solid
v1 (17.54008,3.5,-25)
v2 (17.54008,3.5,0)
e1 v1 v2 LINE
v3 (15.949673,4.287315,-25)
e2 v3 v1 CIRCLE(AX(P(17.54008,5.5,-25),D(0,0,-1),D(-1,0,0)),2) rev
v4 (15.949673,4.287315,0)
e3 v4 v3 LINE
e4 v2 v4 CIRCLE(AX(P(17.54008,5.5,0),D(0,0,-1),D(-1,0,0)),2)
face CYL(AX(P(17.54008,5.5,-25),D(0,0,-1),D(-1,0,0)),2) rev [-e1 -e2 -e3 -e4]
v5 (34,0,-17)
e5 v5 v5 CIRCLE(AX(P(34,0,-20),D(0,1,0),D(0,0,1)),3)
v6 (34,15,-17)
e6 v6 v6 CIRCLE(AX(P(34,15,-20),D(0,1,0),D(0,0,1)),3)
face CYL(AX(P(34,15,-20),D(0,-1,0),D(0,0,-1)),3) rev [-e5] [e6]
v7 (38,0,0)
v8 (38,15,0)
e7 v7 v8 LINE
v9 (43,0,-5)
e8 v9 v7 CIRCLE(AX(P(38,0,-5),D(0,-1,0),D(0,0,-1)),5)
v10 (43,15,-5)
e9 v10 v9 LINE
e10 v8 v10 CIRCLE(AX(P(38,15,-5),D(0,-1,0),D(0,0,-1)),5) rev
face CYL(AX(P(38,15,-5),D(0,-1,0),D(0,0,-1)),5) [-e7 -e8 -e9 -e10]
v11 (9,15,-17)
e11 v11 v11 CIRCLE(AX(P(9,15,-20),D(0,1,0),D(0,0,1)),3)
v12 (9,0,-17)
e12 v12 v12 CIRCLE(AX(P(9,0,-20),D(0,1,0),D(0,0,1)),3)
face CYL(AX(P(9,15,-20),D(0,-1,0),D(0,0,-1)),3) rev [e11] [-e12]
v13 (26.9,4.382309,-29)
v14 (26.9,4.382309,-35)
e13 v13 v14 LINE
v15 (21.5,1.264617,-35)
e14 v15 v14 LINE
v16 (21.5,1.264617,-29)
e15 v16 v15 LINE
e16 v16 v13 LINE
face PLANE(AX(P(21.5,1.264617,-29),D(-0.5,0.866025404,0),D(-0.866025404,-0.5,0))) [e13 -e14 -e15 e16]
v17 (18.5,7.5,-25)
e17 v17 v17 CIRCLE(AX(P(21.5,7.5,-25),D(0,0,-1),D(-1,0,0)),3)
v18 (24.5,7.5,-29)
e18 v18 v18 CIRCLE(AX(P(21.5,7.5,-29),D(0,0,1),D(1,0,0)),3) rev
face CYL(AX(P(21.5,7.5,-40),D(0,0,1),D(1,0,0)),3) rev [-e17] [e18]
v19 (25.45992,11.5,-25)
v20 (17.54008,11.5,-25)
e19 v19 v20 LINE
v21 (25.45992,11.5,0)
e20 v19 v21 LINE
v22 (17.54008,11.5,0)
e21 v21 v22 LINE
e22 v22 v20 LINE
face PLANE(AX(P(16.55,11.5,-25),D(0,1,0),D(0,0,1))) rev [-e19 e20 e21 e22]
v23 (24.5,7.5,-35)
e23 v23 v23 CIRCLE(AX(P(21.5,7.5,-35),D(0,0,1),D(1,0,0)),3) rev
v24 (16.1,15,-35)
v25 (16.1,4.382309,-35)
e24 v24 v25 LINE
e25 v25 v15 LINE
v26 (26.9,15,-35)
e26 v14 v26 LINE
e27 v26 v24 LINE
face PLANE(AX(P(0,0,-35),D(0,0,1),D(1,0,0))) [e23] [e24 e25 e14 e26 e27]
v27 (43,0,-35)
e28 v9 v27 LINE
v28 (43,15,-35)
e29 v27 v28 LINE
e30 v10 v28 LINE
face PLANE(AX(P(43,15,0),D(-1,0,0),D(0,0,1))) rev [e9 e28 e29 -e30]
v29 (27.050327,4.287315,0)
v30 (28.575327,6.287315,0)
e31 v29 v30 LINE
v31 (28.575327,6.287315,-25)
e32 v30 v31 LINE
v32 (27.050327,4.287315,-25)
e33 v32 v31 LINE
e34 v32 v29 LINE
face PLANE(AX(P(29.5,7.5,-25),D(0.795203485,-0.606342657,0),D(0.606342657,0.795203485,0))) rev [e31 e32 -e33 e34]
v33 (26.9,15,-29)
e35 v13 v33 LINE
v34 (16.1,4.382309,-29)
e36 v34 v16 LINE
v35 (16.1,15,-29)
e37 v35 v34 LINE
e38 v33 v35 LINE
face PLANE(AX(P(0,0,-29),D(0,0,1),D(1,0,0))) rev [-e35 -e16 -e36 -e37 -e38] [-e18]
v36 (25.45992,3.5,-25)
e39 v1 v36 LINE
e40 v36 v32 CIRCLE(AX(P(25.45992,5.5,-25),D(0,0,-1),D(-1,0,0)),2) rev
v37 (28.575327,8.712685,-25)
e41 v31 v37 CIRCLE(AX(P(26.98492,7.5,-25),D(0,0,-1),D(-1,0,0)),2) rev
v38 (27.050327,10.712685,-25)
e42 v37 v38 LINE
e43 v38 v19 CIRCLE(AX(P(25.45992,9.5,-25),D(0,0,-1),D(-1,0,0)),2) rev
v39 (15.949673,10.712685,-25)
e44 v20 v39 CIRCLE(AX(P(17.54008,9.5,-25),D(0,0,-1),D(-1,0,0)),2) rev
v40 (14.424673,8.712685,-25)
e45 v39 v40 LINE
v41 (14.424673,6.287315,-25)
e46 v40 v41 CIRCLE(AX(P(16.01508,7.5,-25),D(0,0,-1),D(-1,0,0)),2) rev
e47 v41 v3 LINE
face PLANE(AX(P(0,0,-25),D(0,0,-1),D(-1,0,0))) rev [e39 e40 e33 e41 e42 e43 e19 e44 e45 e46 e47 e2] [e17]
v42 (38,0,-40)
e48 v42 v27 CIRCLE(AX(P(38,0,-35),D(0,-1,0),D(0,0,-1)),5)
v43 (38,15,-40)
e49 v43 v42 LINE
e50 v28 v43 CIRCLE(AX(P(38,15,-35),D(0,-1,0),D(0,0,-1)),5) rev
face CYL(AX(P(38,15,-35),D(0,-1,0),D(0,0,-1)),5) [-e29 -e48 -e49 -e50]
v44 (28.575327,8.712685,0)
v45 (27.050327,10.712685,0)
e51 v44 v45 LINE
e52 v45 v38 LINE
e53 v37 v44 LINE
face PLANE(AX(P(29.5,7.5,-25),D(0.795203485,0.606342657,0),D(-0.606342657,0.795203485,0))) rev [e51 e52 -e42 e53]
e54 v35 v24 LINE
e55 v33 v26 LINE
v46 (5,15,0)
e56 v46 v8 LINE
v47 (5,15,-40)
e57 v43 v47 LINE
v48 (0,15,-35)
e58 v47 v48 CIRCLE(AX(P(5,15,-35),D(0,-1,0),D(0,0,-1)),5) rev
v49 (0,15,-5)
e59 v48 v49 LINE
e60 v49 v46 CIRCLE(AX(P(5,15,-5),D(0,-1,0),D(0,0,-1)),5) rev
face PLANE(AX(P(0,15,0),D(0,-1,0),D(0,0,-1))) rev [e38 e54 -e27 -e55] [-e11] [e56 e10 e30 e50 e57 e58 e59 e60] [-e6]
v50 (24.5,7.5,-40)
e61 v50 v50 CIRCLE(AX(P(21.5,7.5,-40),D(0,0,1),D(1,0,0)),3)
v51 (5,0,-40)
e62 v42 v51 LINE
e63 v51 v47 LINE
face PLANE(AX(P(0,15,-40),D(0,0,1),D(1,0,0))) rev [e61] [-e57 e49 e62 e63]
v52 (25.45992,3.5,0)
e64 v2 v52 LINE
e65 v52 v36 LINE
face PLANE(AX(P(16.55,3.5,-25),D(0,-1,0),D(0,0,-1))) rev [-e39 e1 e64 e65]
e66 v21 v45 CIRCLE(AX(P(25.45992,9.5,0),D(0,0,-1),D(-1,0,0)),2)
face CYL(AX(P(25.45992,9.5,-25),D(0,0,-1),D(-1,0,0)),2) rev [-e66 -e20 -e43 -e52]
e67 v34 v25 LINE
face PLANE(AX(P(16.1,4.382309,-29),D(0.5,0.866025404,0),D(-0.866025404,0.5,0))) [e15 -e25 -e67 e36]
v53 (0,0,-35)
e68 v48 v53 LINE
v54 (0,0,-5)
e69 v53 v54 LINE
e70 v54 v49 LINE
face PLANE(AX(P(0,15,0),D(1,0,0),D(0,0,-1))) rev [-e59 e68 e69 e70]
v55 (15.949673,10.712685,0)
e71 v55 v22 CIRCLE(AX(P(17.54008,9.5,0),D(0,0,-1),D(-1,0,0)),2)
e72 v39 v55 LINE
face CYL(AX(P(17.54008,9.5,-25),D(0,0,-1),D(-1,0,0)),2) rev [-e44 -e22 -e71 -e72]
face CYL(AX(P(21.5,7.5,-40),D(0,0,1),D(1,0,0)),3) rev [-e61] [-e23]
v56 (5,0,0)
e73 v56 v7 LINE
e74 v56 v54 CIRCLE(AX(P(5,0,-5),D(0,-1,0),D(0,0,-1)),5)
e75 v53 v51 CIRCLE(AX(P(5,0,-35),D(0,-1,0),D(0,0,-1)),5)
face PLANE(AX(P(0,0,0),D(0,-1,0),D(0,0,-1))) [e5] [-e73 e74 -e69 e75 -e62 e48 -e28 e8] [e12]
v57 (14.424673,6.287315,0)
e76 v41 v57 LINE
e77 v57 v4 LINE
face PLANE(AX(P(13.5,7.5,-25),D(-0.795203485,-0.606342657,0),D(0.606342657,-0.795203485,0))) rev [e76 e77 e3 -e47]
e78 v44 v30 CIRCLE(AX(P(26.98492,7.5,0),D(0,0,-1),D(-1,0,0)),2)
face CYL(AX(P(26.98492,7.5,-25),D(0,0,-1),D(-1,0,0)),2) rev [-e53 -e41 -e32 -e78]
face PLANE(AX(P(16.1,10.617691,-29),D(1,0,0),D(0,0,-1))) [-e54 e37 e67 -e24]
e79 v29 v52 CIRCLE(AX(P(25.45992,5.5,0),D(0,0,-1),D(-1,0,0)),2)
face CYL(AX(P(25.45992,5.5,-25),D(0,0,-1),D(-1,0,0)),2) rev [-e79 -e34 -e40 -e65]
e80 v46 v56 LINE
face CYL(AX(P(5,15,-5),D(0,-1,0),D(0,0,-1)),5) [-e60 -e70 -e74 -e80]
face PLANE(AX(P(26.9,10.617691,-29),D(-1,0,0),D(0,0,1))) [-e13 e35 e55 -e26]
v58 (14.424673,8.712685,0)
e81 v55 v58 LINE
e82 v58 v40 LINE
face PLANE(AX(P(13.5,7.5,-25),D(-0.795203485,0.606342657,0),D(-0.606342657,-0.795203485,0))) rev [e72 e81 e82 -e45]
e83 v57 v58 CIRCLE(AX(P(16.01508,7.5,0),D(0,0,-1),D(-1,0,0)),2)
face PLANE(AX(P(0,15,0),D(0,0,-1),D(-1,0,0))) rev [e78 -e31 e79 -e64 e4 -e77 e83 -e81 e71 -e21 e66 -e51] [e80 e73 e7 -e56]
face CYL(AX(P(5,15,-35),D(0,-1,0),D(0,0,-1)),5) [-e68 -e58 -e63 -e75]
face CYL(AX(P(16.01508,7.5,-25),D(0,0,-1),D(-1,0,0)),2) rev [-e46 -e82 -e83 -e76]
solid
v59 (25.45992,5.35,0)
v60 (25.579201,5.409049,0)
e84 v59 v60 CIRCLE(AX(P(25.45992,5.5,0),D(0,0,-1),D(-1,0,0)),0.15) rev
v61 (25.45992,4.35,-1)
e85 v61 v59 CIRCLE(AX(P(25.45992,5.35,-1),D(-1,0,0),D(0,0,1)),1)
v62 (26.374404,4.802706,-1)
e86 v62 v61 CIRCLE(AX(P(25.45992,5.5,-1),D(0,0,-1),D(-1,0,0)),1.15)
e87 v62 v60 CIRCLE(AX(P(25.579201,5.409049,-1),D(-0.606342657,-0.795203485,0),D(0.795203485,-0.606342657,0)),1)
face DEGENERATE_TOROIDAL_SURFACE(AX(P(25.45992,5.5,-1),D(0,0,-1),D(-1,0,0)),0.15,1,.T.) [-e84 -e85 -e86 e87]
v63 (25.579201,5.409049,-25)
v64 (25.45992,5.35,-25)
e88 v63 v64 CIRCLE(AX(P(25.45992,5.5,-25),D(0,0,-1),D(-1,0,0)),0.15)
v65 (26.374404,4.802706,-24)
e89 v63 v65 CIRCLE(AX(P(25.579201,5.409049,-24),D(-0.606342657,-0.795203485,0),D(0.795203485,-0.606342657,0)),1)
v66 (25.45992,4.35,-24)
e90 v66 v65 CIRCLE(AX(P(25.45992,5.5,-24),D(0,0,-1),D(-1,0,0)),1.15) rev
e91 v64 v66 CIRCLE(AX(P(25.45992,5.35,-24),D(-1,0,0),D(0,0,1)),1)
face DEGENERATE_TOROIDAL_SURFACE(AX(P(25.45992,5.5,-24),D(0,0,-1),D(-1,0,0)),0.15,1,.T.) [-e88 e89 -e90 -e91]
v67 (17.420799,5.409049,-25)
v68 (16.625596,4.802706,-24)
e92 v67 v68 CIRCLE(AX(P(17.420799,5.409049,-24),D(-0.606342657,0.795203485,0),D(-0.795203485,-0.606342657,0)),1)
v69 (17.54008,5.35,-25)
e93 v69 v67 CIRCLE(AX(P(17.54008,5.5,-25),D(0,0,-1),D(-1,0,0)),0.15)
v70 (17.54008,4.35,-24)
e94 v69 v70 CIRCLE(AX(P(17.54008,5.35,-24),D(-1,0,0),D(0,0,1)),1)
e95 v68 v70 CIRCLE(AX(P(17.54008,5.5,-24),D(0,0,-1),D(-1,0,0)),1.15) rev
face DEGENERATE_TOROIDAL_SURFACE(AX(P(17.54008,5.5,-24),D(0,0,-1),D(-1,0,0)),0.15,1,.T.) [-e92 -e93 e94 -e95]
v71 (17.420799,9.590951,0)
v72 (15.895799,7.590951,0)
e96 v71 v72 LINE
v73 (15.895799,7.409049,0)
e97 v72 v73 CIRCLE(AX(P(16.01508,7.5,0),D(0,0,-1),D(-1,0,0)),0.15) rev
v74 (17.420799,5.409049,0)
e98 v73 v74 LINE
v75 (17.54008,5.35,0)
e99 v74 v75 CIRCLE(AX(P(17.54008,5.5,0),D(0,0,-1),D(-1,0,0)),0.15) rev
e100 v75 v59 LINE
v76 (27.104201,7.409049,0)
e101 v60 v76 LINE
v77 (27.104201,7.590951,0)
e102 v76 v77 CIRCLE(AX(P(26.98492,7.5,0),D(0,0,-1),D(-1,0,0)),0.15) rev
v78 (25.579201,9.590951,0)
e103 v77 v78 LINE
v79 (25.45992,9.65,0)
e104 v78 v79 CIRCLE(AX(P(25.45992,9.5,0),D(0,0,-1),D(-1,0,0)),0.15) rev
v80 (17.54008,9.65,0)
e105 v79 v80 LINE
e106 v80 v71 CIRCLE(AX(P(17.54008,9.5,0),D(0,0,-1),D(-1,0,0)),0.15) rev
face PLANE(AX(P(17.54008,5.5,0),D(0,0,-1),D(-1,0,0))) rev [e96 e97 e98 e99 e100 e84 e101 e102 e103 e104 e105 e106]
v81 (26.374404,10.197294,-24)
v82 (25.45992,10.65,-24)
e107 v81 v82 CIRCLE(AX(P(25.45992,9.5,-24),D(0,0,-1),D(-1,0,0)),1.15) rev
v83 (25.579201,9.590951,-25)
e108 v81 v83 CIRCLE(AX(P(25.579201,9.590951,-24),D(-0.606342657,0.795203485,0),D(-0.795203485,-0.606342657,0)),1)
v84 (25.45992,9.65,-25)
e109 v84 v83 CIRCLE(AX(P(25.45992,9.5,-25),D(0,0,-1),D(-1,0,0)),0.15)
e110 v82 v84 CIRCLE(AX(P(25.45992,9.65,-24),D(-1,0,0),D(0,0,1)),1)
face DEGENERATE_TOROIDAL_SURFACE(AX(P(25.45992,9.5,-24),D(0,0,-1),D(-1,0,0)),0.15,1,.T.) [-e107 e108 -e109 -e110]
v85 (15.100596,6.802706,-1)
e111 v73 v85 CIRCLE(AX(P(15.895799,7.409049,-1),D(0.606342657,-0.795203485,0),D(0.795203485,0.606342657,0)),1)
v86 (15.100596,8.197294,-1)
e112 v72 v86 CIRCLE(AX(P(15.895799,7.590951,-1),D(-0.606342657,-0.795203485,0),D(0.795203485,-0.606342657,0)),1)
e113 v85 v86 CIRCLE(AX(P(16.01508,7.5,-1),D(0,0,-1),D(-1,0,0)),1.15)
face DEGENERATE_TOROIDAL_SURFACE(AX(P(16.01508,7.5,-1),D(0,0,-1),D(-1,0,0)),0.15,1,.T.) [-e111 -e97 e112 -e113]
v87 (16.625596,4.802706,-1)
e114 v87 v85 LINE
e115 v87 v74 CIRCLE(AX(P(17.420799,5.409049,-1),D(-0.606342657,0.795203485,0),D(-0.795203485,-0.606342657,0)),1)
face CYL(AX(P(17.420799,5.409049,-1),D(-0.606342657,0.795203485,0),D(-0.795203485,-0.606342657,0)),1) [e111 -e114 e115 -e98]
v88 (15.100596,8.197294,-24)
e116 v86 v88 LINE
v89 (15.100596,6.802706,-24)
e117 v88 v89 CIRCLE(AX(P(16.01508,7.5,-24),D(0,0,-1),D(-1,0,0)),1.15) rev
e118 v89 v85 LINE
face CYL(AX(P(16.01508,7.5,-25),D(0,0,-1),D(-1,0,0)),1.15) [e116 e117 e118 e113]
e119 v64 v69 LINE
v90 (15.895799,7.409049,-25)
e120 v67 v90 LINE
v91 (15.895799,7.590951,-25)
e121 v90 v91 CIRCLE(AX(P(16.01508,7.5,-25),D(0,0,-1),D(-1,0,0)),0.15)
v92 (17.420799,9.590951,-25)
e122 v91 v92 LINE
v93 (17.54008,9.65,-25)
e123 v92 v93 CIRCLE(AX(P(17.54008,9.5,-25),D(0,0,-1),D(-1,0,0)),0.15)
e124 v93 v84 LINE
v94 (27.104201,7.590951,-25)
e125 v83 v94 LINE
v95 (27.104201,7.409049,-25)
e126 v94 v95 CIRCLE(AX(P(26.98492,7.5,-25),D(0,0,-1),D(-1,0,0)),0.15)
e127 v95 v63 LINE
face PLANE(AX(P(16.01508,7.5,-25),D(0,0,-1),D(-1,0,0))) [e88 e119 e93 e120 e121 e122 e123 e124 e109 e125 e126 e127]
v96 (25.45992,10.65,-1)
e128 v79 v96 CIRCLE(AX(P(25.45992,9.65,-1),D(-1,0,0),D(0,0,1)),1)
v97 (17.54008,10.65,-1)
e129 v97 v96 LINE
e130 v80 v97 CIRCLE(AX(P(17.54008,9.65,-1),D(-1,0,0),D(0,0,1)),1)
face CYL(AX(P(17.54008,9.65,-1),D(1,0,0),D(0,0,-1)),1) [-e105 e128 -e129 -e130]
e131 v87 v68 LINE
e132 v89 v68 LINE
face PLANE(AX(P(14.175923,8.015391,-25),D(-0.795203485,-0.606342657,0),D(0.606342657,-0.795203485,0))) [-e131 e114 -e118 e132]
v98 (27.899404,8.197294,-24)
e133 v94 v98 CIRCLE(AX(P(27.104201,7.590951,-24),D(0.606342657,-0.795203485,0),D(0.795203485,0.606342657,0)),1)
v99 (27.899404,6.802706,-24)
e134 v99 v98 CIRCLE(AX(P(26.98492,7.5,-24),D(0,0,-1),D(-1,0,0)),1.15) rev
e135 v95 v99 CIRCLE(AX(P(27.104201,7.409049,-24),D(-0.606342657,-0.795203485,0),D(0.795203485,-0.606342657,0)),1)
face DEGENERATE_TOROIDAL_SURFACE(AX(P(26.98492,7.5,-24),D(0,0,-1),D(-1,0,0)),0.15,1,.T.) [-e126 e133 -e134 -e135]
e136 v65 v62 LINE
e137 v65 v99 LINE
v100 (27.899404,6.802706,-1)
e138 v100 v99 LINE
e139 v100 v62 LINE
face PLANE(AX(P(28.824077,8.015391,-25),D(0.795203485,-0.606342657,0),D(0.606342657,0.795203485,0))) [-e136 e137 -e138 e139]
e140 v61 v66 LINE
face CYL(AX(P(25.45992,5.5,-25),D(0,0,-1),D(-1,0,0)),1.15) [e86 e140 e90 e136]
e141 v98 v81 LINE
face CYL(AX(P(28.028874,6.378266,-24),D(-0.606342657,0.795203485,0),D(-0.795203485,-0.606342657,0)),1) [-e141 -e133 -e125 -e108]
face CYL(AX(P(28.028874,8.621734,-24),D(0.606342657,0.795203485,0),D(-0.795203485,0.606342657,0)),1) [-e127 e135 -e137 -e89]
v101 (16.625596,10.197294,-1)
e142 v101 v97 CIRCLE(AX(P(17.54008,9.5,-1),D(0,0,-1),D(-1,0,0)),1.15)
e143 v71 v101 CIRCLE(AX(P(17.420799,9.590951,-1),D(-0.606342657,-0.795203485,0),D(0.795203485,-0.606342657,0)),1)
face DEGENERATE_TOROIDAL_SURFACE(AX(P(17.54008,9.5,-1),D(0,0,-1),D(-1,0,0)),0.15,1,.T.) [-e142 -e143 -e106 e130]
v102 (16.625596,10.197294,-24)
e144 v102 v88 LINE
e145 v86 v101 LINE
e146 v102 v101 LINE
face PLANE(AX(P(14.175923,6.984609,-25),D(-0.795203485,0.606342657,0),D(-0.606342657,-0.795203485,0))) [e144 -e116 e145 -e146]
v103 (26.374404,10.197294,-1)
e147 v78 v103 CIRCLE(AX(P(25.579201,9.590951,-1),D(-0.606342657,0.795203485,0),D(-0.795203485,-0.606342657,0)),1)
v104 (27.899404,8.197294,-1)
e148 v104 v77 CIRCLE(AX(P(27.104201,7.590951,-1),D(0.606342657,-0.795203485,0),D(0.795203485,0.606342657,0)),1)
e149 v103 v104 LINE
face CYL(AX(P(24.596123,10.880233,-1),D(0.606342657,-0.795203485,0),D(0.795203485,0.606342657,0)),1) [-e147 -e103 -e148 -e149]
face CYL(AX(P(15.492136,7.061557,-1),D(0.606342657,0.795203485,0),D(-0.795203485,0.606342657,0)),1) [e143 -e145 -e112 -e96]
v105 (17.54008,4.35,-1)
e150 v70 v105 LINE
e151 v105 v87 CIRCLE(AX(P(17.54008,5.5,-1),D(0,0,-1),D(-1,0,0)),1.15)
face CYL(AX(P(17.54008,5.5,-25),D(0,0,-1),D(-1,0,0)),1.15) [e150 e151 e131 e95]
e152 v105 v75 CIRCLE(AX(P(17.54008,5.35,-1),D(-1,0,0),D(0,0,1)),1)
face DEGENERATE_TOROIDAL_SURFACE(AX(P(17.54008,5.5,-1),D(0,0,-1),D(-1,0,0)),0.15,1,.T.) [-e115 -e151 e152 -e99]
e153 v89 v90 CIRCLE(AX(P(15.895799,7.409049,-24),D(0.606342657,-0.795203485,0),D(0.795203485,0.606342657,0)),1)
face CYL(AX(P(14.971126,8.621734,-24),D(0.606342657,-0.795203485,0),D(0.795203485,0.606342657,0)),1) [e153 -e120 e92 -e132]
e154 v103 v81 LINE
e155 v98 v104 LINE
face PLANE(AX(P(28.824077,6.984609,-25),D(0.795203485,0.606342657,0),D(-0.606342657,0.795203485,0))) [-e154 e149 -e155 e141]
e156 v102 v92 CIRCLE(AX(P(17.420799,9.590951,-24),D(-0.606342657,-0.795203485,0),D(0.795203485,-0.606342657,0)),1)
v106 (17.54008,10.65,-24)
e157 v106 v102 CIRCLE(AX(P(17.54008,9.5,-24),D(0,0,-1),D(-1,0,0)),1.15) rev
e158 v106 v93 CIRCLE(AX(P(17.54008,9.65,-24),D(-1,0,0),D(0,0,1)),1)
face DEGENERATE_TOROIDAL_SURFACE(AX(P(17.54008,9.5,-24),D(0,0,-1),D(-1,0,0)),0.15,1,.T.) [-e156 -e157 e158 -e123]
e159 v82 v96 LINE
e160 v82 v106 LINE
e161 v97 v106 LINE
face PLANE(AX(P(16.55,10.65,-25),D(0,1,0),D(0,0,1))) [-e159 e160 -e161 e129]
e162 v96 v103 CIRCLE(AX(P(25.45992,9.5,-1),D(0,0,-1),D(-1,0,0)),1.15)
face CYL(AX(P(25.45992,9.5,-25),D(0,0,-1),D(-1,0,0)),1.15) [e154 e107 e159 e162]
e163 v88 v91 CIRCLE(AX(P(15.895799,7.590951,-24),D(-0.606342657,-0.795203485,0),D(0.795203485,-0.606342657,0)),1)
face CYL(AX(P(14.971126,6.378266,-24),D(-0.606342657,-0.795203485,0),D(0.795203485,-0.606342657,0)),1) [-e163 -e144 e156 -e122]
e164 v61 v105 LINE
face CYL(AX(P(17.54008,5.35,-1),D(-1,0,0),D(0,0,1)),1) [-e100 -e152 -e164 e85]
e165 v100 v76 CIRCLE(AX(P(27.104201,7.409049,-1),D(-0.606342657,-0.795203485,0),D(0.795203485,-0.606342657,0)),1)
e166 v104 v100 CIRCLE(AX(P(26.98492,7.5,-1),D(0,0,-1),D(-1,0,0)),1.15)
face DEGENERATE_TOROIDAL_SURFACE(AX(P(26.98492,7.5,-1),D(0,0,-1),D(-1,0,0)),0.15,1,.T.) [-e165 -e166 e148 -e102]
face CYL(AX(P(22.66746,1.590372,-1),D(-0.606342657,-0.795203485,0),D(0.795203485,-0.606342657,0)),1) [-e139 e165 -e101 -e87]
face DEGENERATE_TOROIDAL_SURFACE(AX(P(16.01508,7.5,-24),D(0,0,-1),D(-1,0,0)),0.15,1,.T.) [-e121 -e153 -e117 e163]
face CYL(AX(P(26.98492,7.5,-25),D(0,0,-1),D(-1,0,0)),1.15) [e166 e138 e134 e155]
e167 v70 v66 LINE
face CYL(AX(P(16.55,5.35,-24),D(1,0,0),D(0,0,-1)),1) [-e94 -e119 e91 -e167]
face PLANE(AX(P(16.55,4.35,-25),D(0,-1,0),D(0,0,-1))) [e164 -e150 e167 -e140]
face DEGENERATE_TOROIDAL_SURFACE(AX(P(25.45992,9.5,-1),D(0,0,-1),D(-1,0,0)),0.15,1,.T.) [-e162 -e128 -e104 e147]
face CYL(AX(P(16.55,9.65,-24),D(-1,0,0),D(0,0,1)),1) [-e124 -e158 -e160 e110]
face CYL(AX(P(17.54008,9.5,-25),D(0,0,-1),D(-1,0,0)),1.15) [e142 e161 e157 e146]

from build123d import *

# Parameters (mm, degrees)
SKETCH1_W           = 43
SKETCH1_H           = 40
BOSS_EXTRUDE1_DEPTH = 15
CUT_EXTRUDE1_DEPTH  = 25
SKETCH3_R           = 3
CUT_EXTRUDE2_DEPTH  = 61.613529843
SKETCH4_R           = 3
CUT_EXTRUDE3_DEPTH  = 61.613529843
FILLET1_R           = 2
FILLET3_R           = 5
SURFACE_KNIT1_START = -25
SURFACE_KNIT1_DEPTH = 25
FILLET2_R           = 1
CUT_EXTRUDE4_START  = 5
CUT_EXTRUDE4_DEPTH  = 6


# Read off the part's stored shape, not the designer's step: Surface-Knit1
with BuildPart() as part:
    # Sketch1 → Boss-Extrude1 (new body)
    with BuildSketch(Plane(origin=(0, 0, 0), x_dir=(1, 0, 0), z_dir=(0, 1, 0))):
        with Locations((21.5, 20)):
            Rectangle(SKETCH1_W, SKETCH1_H)
    extrude(amount=BOSS_EXTRUDE1_DEPTH)

    # Sketch2 → Cut-Extrude1 (cut)
    with BuildSketch(Plane.XY):
        Polygon((13.5, 7.5), (16.55, 11.5), (26.45, 11.5), (29.5, 7.5), (26.45, 3.5), (16.55, 3.5), align=None)
    extrude(amount=-CUT_EXTRUDE1_DEPTH, mode=Mode.SUBTRACT)

    # Sketch3 → Cut-Extrude2 (cut, through all)
    with BuildSketch(Plane.XY):
        with Locations((21.5, 7.5)):
            Circle(SKETCH3_R)
    extrude(amount=-CUT_EXTRUDE2_DEPTH, mode=Mode.SUBTRACT)

    # Sketch4 → Cut-Extrude3 (cut, through all)
    with BuildSketch(Plane(origin=(0, 0, 0), x_dir=(1, 0, 0), z_dir=(0, 1, 0))):
        with Locations(Location((9, 20, 0), (0, 0, 270))):
            Circle(SKETCH4_R)
        with Locations(Location((34, 20, 0), (0, 0, 270))):
            Circle(SKETCH4_R)
    extrude(amount=CUT_EXTRUDE3_DEPTH, mode=Mode.SUBTRACT)

    # Fillet1
    fillet1_edges = [part.edges().sort_by_distance(p)[0] for p in [
        (16.55, 3.5, -12.5),
        (13.5, 7.5, -12.5),
        (16.55, 11.5, -12.5),
        (26.45, 11.5, -12.5),
        (29.5, 7.5, -12.5),
        (26.45, 3.5, -12.5),
    ]]
    fillet(fillet1_edges, radius=FILLET1_R)

    # Fillet3
    fillet3_edges = [part.edges().sort_by_distance(p)[0] for p in [
        (0, 7.5, -40),
        (43, 7.5, -40),
        (43, 7.5, 0),
        (0, 7.5, 0),
    ]]
    fillet(fillet3_edges, radius=FILLET3_R)

    # Sketch6 → Cut-Extrude4 (cut)
    with BuildSketch(Plane.XY.offset(-40).offset(CUT_EXTRUDE4_START)):
        Polygon((26.9, 10.617691454), (26.9, 15), (16.1, 15), (16.1, 10.617691454), (16.1, 4.382308546), (21.5, 1.264617093), (26.9, 4.382308546), align=None)
    extrude(amount=CUT_EXTRUDE4_DEPTH, mode=Mode.SUBTRACT)


with BuildPart() as body_2:
    # Surface-Knit1 outline → Surface-Knit1 (new body)
    with BuildSketch(Plane.XY.offset(SURFACE_KNIT1_START)):
        with BuildLine():
            ThreePointArc((16.625595514, 4.802705944), (17.029877681, 4.469371996), (17.540079522, 4.35))
            Line((17.540079522, 4.35), (25.459920478, 4.35))
            ThreePointArc((25.459920478, 4.35), (25.970122319, 4.469371996), (26.374404486, 4.802705944))
            Line((26.374404486, 4.802705944), (27.899404486, 6.802705944))
            ThreePointArc((27.899404486, 6.802705944), (28.134920478, 7.5), (27.899404486, 8.197294056))
            Line((27.899404486, 8.197294056), (26.374404486, 10.197294056))
            ThreePointArc((26.374404486, 10.197294056), (25.970122319, 10.530628004), (25.459920478, 10.65))
            Line((25.459920478, 10.65), (17.540079522, 10.65))
            ThreePointArc((17.540079522, 10.65), (17.029877681, 10.530628004), (16.625595514, 10.197294056))
            Line((16.625595514, 10.197294056), (15.100595514, 8.197294056))
            ThreePointArc((15.100595514, 8.197294056), (14.865079522, 7.5), (15.100595514, 6.802705944))
            Line((15.100595514, 6.802705944), (16.625595514, 4.802705944))
        make_face()
    extrude(amount=SURFACE_KNIT1_DEPTH)

    # Fillet2
    fillet2_edges = [body_2.edges().sort_by_distance(p)[0] for p in [
        (14.865079522, 7.5, 0),
        (15.863095514, 9.197294056, -25),
        (15.863095514, 9.197294056, 0),
        (21.5, 10.65, -25),
        (21.5, 10.65, 0),
        (17.029877681, 10.530628004, -25),
        (17.029877681, 10.530628004, 0),
        (25.970122319, 10.530628004, -25),
        (25.970122319, 10.530628004, 0),
        (27.136904486, 9.197294056, -25),
        (27.136904486, 9.197294056, 0),
        (28.134920478, 7.5, -25),
        (28.134920478, 7.5, 0),
        (25.970122319, 4.469371996, -25),
        (25.970122319, 4.469371996, 0),
        (27.136904486, 5.802705944, -25),
        (27.136904486, 5.802705944, 0),
        (21.5, 4.35, -25),
        (21.5, 4.35, 0),
        (17.029877681, 4.469371996, -25),
        (17.029877681, 4.469371996, 0),
        (15.863095514, 5.802705944, 0),
        (15.863095514, 5.802705944, -25),
        (14.865079522, 7.5, -25),
    ]]
    fillet(fillet2_edges, radius=FILLET2_R)


solid = Compound([part.part, body_2.part])
